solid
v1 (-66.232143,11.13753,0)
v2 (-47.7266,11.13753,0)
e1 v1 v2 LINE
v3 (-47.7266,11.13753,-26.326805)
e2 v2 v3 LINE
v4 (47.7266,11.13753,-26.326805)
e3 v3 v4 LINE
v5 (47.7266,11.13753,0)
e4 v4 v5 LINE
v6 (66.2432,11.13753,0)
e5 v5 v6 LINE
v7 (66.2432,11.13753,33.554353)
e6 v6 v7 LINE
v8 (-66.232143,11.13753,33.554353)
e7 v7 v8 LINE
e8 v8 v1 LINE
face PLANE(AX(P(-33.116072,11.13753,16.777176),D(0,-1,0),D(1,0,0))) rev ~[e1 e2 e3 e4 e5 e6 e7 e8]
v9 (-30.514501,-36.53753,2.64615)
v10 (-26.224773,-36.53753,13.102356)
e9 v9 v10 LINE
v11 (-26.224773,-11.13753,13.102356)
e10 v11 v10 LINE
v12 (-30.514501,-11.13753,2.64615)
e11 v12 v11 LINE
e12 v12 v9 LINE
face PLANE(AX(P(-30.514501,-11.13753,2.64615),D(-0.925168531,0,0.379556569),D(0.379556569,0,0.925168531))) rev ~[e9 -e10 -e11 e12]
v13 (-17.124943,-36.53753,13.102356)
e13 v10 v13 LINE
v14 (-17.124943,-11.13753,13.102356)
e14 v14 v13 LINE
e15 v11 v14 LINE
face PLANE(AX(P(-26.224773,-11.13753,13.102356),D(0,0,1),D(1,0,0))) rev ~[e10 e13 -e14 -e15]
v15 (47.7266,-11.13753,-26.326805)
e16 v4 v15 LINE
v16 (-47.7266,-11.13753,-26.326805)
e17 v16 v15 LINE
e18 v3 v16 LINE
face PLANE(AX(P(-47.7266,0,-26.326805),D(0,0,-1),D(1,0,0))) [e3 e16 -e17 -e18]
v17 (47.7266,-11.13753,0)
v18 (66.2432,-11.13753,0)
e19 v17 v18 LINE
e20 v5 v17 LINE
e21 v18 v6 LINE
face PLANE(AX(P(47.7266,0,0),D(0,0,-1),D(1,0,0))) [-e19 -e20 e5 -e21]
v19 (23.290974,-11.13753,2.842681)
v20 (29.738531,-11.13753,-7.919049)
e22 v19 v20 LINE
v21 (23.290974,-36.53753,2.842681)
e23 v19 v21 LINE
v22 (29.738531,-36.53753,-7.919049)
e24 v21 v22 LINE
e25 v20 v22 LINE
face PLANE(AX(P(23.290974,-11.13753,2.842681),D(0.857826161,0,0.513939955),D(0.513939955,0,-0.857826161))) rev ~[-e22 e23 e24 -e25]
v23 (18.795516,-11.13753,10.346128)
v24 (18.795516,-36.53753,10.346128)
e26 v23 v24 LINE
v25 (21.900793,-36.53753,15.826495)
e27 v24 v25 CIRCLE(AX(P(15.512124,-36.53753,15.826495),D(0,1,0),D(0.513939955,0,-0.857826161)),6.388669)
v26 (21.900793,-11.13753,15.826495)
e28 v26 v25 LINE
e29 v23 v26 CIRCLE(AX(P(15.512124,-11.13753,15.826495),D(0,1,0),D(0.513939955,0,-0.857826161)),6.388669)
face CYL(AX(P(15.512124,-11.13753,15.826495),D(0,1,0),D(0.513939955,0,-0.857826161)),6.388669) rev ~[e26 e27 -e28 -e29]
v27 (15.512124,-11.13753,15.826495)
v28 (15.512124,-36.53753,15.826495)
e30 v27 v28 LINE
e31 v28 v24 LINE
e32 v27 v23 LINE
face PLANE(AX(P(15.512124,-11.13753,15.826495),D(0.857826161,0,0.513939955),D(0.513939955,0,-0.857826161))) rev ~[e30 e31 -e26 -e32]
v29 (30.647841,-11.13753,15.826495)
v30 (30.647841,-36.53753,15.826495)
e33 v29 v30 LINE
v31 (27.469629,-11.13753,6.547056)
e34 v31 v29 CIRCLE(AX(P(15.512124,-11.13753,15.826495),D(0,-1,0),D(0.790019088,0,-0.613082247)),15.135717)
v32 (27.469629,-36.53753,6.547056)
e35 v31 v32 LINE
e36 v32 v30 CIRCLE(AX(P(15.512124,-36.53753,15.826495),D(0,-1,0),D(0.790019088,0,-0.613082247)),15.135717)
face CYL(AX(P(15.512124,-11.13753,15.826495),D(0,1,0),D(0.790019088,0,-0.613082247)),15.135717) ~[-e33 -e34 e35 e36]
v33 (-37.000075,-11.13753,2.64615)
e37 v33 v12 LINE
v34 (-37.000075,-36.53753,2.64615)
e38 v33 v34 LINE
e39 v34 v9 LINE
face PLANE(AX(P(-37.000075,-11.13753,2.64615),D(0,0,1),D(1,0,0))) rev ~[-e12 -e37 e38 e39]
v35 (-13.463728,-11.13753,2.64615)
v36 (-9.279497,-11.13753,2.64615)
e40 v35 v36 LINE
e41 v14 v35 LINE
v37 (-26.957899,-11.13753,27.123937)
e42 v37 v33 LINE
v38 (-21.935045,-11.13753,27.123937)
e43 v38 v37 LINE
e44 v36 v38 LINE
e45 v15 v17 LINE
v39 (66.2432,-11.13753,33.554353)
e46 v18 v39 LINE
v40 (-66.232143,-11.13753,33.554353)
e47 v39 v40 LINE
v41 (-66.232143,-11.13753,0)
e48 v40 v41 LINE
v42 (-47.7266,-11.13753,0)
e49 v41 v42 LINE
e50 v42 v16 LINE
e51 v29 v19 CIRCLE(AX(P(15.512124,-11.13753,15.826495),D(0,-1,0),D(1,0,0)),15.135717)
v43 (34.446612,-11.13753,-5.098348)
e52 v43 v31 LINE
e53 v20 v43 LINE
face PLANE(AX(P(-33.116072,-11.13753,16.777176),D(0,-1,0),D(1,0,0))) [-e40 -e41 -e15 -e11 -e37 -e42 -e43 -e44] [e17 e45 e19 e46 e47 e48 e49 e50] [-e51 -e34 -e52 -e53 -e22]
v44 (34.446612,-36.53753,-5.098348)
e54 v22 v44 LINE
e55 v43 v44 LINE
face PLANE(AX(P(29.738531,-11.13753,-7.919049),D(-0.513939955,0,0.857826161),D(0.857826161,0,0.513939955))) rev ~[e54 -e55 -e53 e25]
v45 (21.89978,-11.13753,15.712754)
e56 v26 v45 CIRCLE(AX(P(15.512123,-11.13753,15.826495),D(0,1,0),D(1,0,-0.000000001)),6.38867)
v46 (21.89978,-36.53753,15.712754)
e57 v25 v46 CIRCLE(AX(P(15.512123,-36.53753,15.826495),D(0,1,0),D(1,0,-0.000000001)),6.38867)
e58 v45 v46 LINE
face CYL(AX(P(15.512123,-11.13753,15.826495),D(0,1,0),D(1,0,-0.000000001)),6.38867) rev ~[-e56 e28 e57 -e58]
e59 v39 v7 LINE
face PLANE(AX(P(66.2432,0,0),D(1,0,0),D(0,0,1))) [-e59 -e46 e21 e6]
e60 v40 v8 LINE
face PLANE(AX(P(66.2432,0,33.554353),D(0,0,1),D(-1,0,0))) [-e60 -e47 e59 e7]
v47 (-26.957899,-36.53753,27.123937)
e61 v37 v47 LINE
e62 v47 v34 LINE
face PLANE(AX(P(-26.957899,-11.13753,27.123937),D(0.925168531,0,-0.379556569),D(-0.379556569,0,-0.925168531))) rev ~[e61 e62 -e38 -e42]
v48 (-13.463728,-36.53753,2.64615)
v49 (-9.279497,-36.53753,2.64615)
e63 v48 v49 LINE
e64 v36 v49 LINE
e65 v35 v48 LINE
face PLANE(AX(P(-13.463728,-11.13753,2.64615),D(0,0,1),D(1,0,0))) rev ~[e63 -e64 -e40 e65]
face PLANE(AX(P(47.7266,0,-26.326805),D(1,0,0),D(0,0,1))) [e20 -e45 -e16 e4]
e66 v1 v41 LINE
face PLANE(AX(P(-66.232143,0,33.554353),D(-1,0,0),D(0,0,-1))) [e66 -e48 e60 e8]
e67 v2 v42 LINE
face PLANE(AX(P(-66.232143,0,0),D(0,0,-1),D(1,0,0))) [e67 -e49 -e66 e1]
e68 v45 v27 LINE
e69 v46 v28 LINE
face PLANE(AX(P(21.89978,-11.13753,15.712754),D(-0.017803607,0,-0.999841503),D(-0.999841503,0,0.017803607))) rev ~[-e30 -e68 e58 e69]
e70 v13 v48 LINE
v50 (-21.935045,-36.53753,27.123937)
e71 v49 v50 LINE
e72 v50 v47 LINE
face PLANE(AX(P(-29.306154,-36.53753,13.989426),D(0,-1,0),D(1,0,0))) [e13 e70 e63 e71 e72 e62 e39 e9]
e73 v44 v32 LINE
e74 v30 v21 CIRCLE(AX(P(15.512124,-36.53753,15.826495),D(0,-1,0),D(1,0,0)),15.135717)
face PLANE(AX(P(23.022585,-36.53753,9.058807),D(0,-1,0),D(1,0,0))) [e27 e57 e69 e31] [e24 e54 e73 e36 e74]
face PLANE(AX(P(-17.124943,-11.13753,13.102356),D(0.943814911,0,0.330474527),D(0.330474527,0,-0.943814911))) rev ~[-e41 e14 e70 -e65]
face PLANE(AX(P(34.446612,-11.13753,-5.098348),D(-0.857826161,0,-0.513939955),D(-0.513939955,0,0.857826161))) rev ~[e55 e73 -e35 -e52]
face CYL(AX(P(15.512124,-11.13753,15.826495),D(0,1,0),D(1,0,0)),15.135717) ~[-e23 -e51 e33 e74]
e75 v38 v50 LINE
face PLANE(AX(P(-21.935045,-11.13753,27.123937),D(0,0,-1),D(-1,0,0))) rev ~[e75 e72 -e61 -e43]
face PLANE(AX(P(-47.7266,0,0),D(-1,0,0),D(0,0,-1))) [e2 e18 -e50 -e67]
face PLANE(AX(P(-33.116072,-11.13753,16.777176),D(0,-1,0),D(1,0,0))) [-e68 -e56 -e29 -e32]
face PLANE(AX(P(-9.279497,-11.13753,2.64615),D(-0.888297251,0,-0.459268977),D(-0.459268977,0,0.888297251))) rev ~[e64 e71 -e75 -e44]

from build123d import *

# Parameters (mm, degrees)
F1_DEPTH = 11.1375302076
F3_DEPTH = 25.4


# Not quite as in the source:
# - a feature names something its author has since deleted; it is built from what else it names


with BuildPart() as f1:
    # F0 (on Front) → F1 (new body, symmetric)
    with BuildSketch(Plane.XZ):
        Polygon((-47.7266, 0), (0, 0), (0, 33.5543528199), (-66.2321434704, 33.5543528199), (-66.2321434704, 0), align=None)
        Polygon((47.7266, 0), (0, 0), (0, -26.3268053532), (23.8633, -26.3268053532), (47.7266, -26.3268053532), align=None)
        Polygon((0, 33.5543528199), (0, 0), (47.7266, 0), (66.2432, 0), (66.2432, 33.5543528199), align=None)
        Polygon((0, -26.3268053532), (0, 0), (-47.7266, 0), (-47.7266, -26.3268053532), (-23.8633, -26.3268053532), align=None)
    extrude(amount=F1_DEPTH, both=True)

    # F2 (on face) → F3 (join)
    with BuildSketch(Plane.XZ.offset(11.1375302076)):
        Polygon((-21.9350446656, 23.558561476), (-26.957899332, 27.1239373833), (-37.0000749826, 2.6461503003), (-30.5145010352, 2.6461503003), (-26.2247728504, 13.1023558882), align=None)
        Polygon((-21.9350446656, 27.1239373833), (-26.957899332, 27.1239373833), (-21.9350446656, 23.558561476), (-17.1249434352, 13.1023558882), (-13.4637281299, 2.6461503003), (-9.2794969678, 2.6461503003), align=None)
        Polygon((-17.1249434352, 13.1023558882), (-21.9350446656, 23.558561476), (-26.2247728504, 13.1023558882), align=None)
        with BuildLine():
            ThreePointArc((21.8997799497, 15.7127540144), (21.0422650014, 12.6276476595), (18.7955158738, 10.3461281077))
            Line((18.7955158738, 10.3461281077), (23.2909736673, 2.8426809347))
            ThreePointArc((23.2909736673, 2.8426809347), (25.5526183138, 4.5004893654), (27.4696294265, 6.5470556834))
            Line((27.4696294265, 6.5470556834), (21.9791319159, 15.7113410392))
            Line((21.9791319159, 15.7113410392), (21.8997799497, 15.7127540144))
        make_face()
        with BuildLine():
            Line((23.2909736673, 2.8426809347), (18.7955158738, 10.3461281077))
            ThreePointArc((18.7955158738, 10.3461281077), (9.9537248959, 18.9759861326), (21.9007925331, 15.8264953643))
            ThreePointArc((21.9007925331, 15.8264953643), (21.9005393822, 15.7696224358), (21.8997799497, 15.7127540144))
            Line((21.8997799497, 15.7127540144), (21.9791319159, 15.7113410392))
            Line((21.9791319159, 15.7113410392), (27.4696294265, 6.5470556834))
            ThreePointArc((27.4696294265, 6.5470556834), (29.8312607656, 10.9221852492), (30.6478411926, 15.8264953643))
            ThreePointArc((30.6478411926, 15.8264953643), (2.3434407909, 23.2881127649), (23.2909736673, 2.8426809347))
        make_face()
        with BuildLine():
            ThreePointArc((27.4696294265, 6.5470556834), (25.5526183138, 4.5004893654), (23.2909736673, 2.8426809347))
            Line((23.2909736673, 2.8426809347), (29.7385305166, -7.9190488905))
            Line((29.7385305166, -7.9190488905), (34.4466119702, -5.0983478214))
            Line((34.4466119702, -5.0983478214), (27.4696294265, 6.5470556834))
        make_face()
        with BuildLine():
            Line((21.8997799497, 15.7127540144), (15.512123704, 15.8264953643))
            Line((15.512123704, 15.8264953643), (18.7955158738, 10.3461281077))
            ThreePointArc((18.7955158738, 10.3461281077), (21.0422650014, 12.6276476595), (21.8997799497, 15.7127540144))
        make_face()
    extrude(amount=F3_DEPTH)


solid = f1.part
